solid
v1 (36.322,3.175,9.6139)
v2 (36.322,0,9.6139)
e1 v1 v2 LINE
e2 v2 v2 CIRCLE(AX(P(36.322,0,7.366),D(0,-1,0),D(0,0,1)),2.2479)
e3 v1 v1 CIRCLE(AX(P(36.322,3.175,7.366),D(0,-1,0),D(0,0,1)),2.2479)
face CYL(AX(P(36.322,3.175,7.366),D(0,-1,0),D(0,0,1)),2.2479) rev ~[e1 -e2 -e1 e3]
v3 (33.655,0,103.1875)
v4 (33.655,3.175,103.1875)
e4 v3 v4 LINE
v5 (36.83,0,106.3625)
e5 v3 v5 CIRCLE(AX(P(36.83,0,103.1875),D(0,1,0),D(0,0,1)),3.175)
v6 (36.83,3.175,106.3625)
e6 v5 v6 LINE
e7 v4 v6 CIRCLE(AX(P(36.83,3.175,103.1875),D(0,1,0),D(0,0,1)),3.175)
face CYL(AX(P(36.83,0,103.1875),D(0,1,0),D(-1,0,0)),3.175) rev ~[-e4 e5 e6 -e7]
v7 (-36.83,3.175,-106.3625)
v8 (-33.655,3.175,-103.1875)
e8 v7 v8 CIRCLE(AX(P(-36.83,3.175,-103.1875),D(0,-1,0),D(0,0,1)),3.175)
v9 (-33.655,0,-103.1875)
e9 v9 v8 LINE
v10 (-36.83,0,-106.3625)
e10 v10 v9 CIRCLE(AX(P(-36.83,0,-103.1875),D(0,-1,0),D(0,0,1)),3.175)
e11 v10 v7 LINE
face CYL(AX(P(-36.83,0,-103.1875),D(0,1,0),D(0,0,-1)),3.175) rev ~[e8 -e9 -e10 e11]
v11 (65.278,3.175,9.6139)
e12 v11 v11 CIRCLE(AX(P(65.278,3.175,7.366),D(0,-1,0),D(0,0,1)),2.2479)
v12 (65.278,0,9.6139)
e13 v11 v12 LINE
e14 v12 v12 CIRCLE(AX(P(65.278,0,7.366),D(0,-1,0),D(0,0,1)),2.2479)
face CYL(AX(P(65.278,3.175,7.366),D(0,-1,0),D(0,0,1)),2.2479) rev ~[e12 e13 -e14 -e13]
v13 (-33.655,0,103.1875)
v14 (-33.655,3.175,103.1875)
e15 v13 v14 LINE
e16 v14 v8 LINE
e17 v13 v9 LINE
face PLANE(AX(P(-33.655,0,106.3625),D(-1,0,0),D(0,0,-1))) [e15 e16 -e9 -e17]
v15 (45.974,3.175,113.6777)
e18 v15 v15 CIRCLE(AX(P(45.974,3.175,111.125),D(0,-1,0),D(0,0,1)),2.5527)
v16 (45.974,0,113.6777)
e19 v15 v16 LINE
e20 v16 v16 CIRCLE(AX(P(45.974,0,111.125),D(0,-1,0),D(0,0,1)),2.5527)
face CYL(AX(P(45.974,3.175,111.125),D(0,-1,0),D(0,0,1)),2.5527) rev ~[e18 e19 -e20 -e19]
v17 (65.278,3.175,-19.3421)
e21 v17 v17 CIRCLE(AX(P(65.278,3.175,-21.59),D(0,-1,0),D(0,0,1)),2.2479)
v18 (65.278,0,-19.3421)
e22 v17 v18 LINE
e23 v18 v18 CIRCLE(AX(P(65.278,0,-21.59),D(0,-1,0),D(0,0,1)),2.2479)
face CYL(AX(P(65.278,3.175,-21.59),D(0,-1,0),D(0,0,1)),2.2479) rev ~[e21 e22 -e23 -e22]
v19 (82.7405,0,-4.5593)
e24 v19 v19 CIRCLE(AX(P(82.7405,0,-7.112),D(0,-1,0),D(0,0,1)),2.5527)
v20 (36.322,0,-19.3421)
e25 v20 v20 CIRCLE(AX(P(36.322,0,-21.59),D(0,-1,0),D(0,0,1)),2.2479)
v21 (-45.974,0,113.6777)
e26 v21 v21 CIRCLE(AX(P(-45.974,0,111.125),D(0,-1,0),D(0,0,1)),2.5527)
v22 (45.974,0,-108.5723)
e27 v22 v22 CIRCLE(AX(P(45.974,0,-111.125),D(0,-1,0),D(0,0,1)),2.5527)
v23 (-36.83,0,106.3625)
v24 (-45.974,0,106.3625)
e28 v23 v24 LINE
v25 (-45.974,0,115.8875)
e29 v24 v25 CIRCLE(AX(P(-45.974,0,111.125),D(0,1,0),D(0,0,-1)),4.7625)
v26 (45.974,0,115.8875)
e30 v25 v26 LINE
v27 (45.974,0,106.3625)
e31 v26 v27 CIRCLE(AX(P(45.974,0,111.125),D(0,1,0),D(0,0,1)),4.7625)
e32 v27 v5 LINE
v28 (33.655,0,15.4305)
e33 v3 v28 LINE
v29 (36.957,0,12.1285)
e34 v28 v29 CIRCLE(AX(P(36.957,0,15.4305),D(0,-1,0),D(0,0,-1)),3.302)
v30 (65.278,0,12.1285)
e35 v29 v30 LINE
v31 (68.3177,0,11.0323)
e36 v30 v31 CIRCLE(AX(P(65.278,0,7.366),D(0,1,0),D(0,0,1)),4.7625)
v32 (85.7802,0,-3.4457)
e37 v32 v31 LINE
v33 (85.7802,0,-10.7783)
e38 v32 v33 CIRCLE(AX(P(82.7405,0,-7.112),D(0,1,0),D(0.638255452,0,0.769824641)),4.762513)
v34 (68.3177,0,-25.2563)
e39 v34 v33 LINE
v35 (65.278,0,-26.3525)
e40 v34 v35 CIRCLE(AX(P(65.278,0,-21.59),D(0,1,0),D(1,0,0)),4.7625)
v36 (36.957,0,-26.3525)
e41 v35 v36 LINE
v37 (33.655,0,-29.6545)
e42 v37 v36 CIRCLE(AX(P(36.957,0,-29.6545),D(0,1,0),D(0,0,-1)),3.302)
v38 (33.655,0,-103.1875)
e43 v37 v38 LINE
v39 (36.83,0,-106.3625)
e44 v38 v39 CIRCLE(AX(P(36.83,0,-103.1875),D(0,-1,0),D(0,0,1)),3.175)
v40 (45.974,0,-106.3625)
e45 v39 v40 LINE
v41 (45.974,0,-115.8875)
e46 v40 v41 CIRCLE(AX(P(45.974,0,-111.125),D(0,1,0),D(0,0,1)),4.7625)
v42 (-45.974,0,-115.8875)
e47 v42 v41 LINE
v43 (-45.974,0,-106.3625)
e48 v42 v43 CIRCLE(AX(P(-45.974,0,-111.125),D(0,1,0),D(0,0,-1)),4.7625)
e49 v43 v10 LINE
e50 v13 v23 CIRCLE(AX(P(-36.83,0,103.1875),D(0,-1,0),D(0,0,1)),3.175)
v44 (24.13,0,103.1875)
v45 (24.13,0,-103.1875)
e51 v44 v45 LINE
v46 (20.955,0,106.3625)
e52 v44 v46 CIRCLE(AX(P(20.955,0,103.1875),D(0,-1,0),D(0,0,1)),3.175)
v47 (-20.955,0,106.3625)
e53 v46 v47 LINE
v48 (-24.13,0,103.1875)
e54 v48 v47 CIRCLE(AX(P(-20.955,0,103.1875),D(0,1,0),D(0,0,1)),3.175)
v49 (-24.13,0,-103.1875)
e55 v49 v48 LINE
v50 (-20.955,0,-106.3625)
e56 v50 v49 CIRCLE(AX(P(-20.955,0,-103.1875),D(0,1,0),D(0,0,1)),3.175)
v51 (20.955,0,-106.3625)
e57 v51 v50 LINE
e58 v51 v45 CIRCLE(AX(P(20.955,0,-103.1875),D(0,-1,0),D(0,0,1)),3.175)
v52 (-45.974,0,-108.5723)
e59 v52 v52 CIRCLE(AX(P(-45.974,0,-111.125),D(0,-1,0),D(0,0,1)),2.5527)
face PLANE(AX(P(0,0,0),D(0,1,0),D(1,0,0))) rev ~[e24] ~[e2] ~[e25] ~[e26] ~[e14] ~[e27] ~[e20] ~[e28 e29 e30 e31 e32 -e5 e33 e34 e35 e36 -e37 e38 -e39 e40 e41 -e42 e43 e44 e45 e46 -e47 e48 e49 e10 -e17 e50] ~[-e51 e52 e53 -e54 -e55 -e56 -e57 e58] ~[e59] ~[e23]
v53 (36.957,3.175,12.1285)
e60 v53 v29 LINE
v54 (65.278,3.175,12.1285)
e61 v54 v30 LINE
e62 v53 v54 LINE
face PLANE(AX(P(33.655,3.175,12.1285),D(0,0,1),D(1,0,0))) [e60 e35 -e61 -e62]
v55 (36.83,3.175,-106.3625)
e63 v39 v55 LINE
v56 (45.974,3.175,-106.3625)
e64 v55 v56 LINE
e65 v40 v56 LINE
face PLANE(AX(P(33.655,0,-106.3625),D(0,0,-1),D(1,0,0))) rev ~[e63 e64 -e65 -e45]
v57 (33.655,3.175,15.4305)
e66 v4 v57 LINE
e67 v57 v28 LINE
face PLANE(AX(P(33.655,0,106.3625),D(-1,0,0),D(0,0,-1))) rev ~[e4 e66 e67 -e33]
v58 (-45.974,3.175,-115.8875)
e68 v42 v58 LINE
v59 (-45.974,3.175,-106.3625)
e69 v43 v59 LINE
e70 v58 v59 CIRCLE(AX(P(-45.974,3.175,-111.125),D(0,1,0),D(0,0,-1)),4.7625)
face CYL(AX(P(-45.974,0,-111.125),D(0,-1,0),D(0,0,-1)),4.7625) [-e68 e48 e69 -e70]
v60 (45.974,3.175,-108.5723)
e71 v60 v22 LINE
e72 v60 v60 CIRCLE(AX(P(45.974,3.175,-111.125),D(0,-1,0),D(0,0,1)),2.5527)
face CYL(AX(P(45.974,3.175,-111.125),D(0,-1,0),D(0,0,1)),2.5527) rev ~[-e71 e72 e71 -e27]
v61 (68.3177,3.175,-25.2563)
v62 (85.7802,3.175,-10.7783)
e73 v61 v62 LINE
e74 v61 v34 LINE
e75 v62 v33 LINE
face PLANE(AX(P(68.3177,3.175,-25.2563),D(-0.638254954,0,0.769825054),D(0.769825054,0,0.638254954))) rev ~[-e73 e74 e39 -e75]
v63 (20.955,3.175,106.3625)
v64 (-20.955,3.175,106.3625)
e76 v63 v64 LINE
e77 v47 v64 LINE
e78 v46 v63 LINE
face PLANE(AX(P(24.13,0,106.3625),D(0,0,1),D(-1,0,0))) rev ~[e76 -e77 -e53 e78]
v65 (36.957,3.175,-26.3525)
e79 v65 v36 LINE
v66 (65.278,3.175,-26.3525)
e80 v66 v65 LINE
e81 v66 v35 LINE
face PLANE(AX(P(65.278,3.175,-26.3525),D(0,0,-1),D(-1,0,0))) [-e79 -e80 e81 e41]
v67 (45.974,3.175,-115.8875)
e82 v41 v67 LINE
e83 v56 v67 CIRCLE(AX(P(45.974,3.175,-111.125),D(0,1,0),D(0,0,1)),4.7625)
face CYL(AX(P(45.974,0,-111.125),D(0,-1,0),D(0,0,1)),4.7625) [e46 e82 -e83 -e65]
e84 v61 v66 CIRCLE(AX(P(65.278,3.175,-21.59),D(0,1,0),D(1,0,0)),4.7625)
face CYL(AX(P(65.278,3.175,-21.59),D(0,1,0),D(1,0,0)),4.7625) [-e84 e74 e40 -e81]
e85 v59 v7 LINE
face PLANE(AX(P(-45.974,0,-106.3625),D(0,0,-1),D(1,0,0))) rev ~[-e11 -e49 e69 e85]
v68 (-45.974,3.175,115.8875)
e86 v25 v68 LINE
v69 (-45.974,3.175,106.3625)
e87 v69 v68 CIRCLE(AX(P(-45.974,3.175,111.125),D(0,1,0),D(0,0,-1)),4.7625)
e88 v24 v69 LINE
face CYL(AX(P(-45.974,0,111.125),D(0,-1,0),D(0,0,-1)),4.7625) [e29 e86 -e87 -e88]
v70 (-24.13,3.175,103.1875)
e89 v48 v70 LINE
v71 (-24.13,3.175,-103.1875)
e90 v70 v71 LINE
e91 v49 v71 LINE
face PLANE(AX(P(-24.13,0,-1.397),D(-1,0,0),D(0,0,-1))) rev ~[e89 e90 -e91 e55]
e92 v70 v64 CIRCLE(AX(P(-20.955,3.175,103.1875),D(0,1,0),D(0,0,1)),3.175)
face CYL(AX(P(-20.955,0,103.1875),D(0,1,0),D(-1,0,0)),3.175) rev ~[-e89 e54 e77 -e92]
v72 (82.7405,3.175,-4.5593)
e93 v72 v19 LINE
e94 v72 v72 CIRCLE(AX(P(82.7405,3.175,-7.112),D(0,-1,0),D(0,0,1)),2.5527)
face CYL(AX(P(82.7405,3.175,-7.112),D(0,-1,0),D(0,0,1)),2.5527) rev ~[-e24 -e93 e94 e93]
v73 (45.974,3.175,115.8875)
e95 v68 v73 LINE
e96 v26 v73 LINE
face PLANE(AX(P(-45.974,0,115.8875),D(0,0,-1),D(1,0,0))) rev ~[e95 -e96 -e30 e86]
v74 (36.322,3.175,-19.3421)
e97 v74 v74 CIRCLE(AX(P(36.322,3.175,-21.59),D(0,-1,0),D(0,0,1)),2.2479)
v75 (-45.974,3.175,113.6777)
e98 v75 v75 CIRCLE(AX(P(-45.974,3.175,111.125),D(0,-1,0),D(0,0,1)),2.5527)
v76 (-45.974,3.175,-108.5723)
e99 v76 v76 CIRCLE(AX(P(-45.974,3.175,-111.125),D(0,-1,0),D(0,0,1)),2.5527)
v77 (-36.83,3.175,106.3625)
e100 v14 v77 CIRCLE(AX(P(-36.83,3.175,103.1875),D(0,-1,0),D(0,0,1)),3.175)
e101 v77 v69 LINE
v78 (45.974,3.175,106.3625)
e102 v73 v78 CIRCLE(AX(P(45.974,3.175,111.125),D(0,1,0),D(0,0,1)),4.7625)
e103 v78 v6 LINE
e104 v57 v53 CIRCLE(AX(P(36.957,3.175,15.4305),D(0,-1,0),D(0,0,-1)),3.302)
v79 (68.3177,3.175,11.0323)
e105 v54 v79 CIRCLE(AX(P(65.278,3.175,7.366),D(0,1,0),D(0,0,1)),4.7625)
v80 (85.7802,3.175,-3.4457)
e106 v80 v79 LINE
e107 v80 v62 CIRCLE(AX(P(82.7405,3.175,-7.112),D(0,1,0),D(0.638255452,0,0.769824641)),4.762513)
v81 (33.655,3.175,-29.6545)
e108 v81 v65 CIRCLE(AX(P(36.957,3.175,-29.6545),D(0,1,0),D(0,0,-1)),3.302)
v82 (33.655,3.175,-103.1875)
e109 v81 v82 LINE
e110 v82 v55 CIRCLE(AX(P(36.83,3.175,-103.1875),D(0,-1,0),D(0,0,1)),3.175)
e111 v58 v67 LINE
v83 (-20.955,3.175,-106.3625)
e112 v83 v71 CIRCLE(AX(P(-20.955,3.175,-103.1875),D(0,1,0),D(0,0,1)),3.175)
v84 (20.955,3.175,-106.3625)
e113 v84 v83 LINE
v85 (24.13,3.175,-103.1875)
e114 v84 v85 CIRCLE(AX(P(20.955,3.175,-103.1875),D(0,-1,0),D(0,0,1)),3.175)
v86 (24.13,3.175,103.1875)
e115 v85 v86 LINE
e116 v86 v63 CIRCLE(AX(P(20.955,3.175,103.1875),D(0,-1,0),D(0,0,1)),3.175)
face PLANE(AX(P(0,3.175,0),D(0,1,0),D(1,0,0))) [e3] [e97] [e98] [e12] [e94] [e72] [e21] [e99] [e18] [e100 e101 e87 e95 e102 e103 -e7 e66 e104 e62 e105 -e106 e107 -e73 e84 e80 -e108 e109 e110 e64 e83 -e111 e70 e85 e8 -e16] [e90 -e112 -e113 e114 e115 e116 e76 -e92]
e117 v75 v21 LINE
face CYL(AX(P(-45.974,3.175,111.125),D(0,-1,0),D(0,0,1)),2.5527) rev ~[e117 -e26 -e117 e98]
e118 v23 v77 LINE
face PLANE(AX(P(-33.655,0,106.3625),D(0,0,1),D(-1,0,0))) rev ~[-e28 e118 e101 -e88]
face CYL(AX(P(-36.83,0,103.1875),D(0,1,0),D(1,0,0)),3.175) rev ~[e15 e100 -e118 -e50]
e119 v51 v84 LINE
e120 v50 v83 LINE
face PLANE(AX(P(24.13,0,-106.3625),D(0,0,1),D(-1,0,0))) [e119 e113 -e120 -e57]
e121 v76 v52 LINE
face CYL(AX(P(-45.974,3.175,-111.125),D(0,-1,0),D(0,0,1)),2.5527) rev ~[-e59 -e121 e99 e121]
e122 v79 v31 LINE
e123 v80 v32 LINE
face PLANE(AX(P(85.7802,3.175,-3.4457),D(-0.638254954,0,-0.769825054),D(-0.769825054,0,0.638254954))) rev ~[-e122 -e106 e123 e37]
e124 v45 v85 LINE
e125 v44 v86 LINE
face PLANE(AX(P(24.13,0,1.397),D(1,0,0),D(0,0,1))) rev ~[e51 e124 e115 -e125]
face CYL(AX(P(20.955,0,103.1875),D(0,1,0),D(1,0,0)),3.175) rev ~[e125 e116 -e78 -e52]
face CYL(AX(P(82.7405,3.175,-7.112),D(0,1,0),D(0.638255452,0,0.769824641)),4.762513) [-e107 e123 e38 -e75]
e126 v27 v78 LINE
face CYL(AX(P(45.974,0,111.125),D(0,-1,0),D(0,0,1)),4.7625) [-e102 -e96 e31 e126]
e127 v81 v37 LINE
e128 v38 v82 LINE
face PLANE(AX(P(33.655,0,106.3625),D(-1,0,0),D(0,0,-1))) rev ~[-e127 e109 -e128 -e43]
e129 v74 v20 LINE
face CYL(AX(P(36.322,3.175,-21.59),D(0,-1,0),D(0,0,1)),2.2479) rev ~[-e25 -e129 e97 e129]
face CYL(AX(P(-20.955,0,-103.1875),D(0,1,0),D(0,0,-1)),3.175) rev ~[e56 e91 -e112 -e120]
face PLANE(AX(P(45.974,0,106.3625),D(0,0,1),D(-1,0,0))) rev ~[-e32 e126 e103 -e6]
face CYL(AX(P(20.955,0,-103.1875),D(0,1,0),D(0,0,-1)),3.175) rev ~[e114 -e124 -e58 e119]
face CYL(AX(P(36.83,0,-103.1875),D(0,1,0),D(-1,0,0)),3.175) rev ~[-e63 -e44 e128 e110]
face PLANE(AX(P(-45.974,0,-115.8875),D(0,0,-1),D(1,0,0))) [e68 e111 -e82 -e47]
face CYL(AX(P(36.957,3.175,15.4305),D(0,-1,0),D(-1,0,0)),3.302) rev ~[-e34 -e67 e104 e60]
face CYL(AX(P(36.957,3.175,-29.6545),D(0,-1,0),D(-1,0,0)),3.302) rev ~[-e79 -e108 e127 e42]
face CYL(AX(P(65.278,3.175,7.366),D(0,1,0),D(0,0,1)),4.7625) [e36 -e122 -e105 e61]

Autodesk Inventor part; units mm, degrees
ref_plane "YZ Plane" through (0, 0, 0) normal (1, 0, 0) x (0, 1, 0)
ref_plane "XZ Plane" through (0, 0, 0) normal (0, 1, 0) x (-1, 0, 0)
ref_plane "XY Plane" through (0, 0, 0) normal (0, 0, 1) x (1, 0, 0)
sketch "Sketch1" plane through (0, 0, 0) normal (0, 1, 0) x (-1, 0, 0)
  line L0 (45.974, 111.125) -> (-45.974, 111.125) construction
  line L1 (45.974, 115.8875) -> (-45.974, 115.8875)
  line L2 (-45.974, 106.3625) -> (45.974, 106.3625)
  arc A0 (45.974, 106.3625) -> (45.974, 115.8875) centre (45.974, 111.125) ccw
  arc A1 (-45.974, 115.8875) -> (-45.974, 106.3625) centre (-45.974, 111.125) ccw
  line L3 (0, 111.125) -> (0, -111.125) construction
  line L4 (45.974, -111.125) -> (-45.974, -111.125) construction
  line L5 (45.974, -115.8875) -> (-45.974, -115.8875)
  line L6 (-45.974, -106.3625) -> (45.974, -106.3625) construction
  arc A2 (45.974, -115.8875) -> (45.974, -106.3625) centre (45.974, -111.125) ccw
  arc A3 (-45.974, -106.3625) -> (-45.974, -115.8875) centre (-45.974, -111.125) ccw
  line L7 (24.13, 106.3625) -> (24.13, -106.3625)
  line L8 (-24.13, 106.3625) -> (-24.13, -106.3625) construction
  line L9 (24.13, 0) -> (-24.13, 0) construction
  line L10 (33.655, 106.3625) -> (33.655, -106.3625)
  line L11 (-33.655, 106.3625) -> (-33.655, -106.3625)
  line L12 (45.974, -106.3625) -> (33.655, -106.3625)
  line L13 (-24.13, -106.3625) -> (24.13, -106.3625)
  line L14 (-24.13, -106.3625) -> (-24.13, 106.3625)
  line L15 (-33.655, -106.3625) -> (-45.974, -106.3625)
  line L16 (14.478, 14.478) -> (-14.478, -14.478) construction
  circle A4 centre (14.478, 14.478) radius 4.7625 construction
  circle A5 centre (-14.478, -14.478) radius 4.7625 construction
  line L17 (11.1788, 17.9127) -> (24.13, 30.353)
  line L18 (11.1788, 11.0433) -> (24.13, -1.397)
  line L19 (-11.1788, -17.9127) -> (-24.13, -30.353)
  line L20 (-11.1788, -11.0433) -> (-24.13, 1.397)
  arc A6 (11.1788, 17.9127) -> (11.1788, 11.0433) centre (14.478, 14.478) ccw
  arc A7 (-11.1788, -17.9127) -> (-11.1788, -11.0433) centre (-14.478, -14.478) ccw
  point P0 (0, 0)
  point P1 (0, 0)
  point P2 (0, 0)
  point P3 (-33.655, 106.3625)
  point P4 (33.655, 106.3625)
  point P5 (0, 0)
  dimension "d0" = 9.525
  dimension "d1" = 91.948
  dimension "d2" = 222.25
  dimension "d4" = 9.525
  dimension "d5" = 48.26
  dimension "d6" = 9.525
  dimension "d7" = 9.525
  dimension "d33" = 28.956
  dimension "d34" = 28.956
  dimension "d35" = 9.525
  dimension "d36" = 9.525
  dimension "d37" = 15.875
  dimension "d38" = 15.875
  dimension "d39" = 15.875
  dimension "d40" = 15.875
extrude "Extrusion1" add sketch "Sketch1" along normal blind 3.175 contours A0 L2 A1 L1 | L10 L12 A2 L5 A3 L15 L11 L2 L14 L13 L7
sketch "Sketch2" plane through (0, 3.175, 0) normal (0, 1, 0) x (1, 0, 0)
  line L0 (-33.655, -106.3625) -> (-45.974, -106.3625) construction
  arc A0 (-45.974, -106.3625) -> (-45.974, -115.8875) centre (-45.974, -111.125) ccw construction
  line L1 (-45.974, -115.8875) -> (45.974, -115.8875) construction
  arc A1 (45.974, -115.8875) -> (45.974, -106.3625) centre (45.974, -111.125) ccw construction
  line L2 (-24.13, -106.3625) -> (-24.13, 106.3625) projected
  line L3 (-24.13, 106.3625) -> (24.13, 106.3625) projected
  line L4 (24.13, 106.3625) -> (24.13, -106.3625) projected
  line L5 (24.13, -106.3625) -> (-24.13, -106.3625) projected
  line L6 (45.974, -106.3625) -> (33.655, -106.3625) projected
  line L7 (33.655, -106.3625) -> (33.655, 106.3625) projected
  line L8 (33.655, 106.3625) -> (45.974, 106.3625) projected
  arc A2 (45.974, 106.3625) -> (45.974, 115.8875) centre (45.974, 111.125) ccw projected
  line L9 (45.974, 115.8875) -> (-45.974, 115.8875) projected
  arc A3 (-45.974, 115.8875) -> (-45.974, 106.3625) centre (-45.974, 111.125) ccw projected
  line L10 (-45.974, 106.3625) -> (-33.655, 106.3625) projected
  line L11 (-33.655, 106.3625) -> (-33.655, -106.3625) projected
  point P0 (0, 0)
  point P1 (45.974, 111.125)
  point P2 (-45.974, 111.125)
  point P3 (-14.478, 71.0565)
  point P4 (14.478, 100.0125)
hole "Hole1" at (-45.974, 3.175, 111.125) at (45.974, 3.175, 111.125) at (45.974, 3.175, -111.125) at (-45.974, 3.175, -111.125) direction (0, -1, 0) diameter 5.1054 end through all clearance for "Flat Head Machine Screw (82)" size "#10" standard "Ansi Unified Screw Threads"
sketch "Sketch3" plane through (0, 3.175, 0) normal (0, 1, 0) x (1, 0, 0)
  circle A0 centre (45.974, 111.125) radius 2.5527 construction
  circle A1 centre (-45.974, -111.125) radius 2.5527 construction
  circle A2 centre (45.974, -111.125) radius 2.5527 construction
  circle A3 centre (-45.974, 111.125) radius 2.5527 construction
  line L0 (-24.13, -106.3625) -> (24.13, -106.3625) construction
  line L1 (24.13, -106.3625) -> (24.13, 106.3625) construction
  line L2 (24.13, 106.3625) -> (-24.13, 106.3625) construction
  line L3 (-24.13, 106.3625) -> (-24.13, -106.3625) construction
  line L4 (-33.655, -106.3625) -> (-33.655, 106.3625) construction
  line L5 (-33.655, 106.3625) -> (-45.974, 106.3625) construction
  arc A4 (-45.974, 115.8875) -> (-45.974, 106.3625) centre (-45.974, 111.125) ccw construction
  line L6 (-45.974, 115.8875) -> (45.974, 115.8875) construction
  arc A5 (45.974, 106.3625) -> (45.974, 115.8875) centre (45.974, 111.125) ccw construction
  line L7 (45.974, 106.3625) -> (33.655, 106.3625) construction
  line L8 (33.655, 106.3625) -> (33.655, -106.3625) construction
  line L9 (33.655, -106.3625) -> (45.974, -106.3625) construction
  arc A6 (45.974, -115.8875) -> (45.974, -106.3625) centre (45.974, -111.125) ccw construction
  line L10 (45.974, -115.8875) -> (-45.974, -115.8875) construction
  arc A7 (-45.974, -106.3625) -> (-45.974, -115.8875) centre (-45.974, -111.125) ccw construction
  line L11 (-45.974, -106.3625) -> (-33.655, -106.3625) construction
  line L12 (65.278, -7.366) -> (36.322, 21.59) construction
  circle A8 centre (65.278, -7.366) radius 4.7625 construction
  circle A9 centre (36.322, 21.59) radius 4.7625 construction
  line L13 (33.655, -106.3625) -> (33.655, 106.3625) construction
  circle A10 centre (36.322, -7.366) radius 4.7625 construction
  circle A11 centre (65.278, 21.59) radius 4.7625 construction
  line L14 (33.655, -12.1285) -> (65.278, -12.1285)
  line L15 (70.0405, -7.366) -> (70.0405, 21.59)
  line L16 (65.278, 26.3525) -> (33.655, 26.3525)
  arc A12 (65.278, -12.1285) -> (70.0405, -7.366) centre (65.278, -7.366) ccw
  arc A13 (70.0405, 21.59) -> (65.278, 26.3525) centre (65.278, 21.59) ccw
  line L17 (33.655, -12.1285) -> (33.655, 26.3525)
  point P0 (0, 0)
  point P1 (50.8, 7.112)
  dimension "d48" = 31.623
  dimension "d50" = 28.956
  dimension "d51" = 9.525
  dimension "d66" = 7.112
  dimension "d67" = 28.956
extrude "Extrusion2" add sketch "Sketch3" against normal blind 3.175
fillet "Fillet2" radius 3.302 2 edges at (33.655, 1.5875, 12.1285) (33.655, 1.5875, -26.3525)
hole "Hole4" at (65.278, 3.175, 7.366) at (36.322, 3.175, -21.59) at (36.322, 3.175, 7.366) at (65.278, 3.175, -21.59) direction (0, -1, 0) diameter 4.4958 end through all clearance for "Flat Head Machine Screw (82)" size "#8" standard "Ansi Unified Screw Threads"
sketch "Sketch5" plane through (0, 3.175, 0) normal (0, 1, 0) x (1, 0, 0)
  circle A0 centre (82.7405, 7.112) radius 4.7625 construction
  circle A1 centre (36.322, -7.366) radius 2.2479 construction
  circle A2 centre (65.278, -7.366) radius 2.2479 construction
  circle A3 centre (36.322, 21.59) radius 2.2479 construction
  circle A4 centre (65.278, 21.59) radius 2.2479 construction
  circle A5 centre (45.974, 111.125) radius 2.5527 construction
  circle A6 centre (-45.974, -111.125) radius 2.5527 construction
  circle A7 centre (45.974, -111.125) radius 2.5527 construction
  circle A8 centre (-45.974, 111.125) radius 2.5527 construction
  line L0 (-24.13, -106.3625) -> (24.13, -106.3625) construction
  line L1 (24.13, -106.3625) -> (24.13, 106.3625) construction
  line L2 (24.13, 106.3625) -> (-24.13, 106.3625) construction
  line L3 (-24.13, 106.3625) -> (-24.13, -106.3625) construction
  line L4 (-33.655, -106.3625) -> (-33.655, 106.3625) construction
  line L5 (-33.655, 106.3625) -> (-45.974, 106.3625) construction
  arc A9 (-45.974, 115.8875) -> (-45.974, 106.3625) centre (-45.974, 111.125) ccw construction
  line L6 (-45.974, 115.8875) -> (45.974, 115.8875) construction
  arc A10 (45.974, 106.3625) -> (45.974, 115.8875) centre (45.974, 111.125) ccw construction
  line L7 (45.974, 106.3625) -> (33.655, 106.3625) construction
  line L8 (33.655, 106.3625) -> (33.655, 29.6545) construction
  arc A11 (33.655, 29.6545) -> (36.957, 26.3525) centre (36.957, 29.6545) ccw construction
  line L9 (36.957, 26.3525) -> (65.278, 26.3525) construction
  arc A12 (70.0405, 21.59) -> (65.278, 26.3525) centre (65.278, 21.59) ccw construction
  line L10 (70.0405, 21.59) -> (70.0405, -7.366) construction
  arc A13 (65.278, -12.1285) -> (70.0405, -7.366) centre (65.278, -7.366) ccw construction
  line L11 (65.278, -12.1285) -> (36.957, -12.1285) construction
  arc A14 (36.957, -12.1285) -> (33.655, -15.4305) centre (36.957, -15.4305) ccw construction
  line L12 (33.655, -15.4305) -> (33.655, -106.3625) construction
  line L13 (33.655, -106.3625) -> (45.974, -106.3625) construction
  arc A15 (45.974, -115.8875) -> (45.974, -106.3625) centre (45.974, -111.125) ccw construction
  line L14 (45.974, -115.8875) -> (-45.974, -115.8875) construction
  arc A16 (-45.974, -106.3625) -> (-45.974, -115.8875) centre (-45.974, -111.125) ccw construction
  line L15 (-45.974, -106.3625) -> (-33.655, -106.3625) construction
  arc A17 (70.0405, 21.59) -> (65.278, 26.3525) centre (65.278, 21.59) ccw construction
  line L16 (68.3177, 25.2563) -> (85.7802, 10.7783)
  line L17 (85.7802, 3.4457) -> (68.3177, -11.0323)
  arc A18 (85.7802, 3.4457) -> (85.7802, 10.7783) centre (82.7405, 7.112) ccw
  line L18 (70.0405, 21.59) -> (70.0405, -7.366)
  arc A19 (70.0405, 21.59) -> (68.3177, 25.2563) centre (65.278, 21.59) ccw
  arc A20 (65.278, -12.1285) -> (70.0405, -7.366) centre (65.278, -7.366) ccw construction
  arc A21 (68.3177, -11.0323) -> (70.0405, -7.366) centre (65.278, -7.366) ccw
  point P0 (0, 0)
  point P1 (70.0405, 7.112)
  point P2 (70.0405, -7.366)
  dimension "d76" = 9.525
  dimension "d77" = 12.7
extrude "Extrusion3" add sketch "Sketch5" against normal up to surface (3.175 mm away)
hole "Hole6" at (82.7405, 3.175, -7.112) direction (0, -1, 0) diameter 5.1054 end through all clearance for "Flat Head Machine Screw (82)" size "#10" standard "Ansi Unified Screw Threads"
fillet "Fillet3" radius 3.175 8 edges at (-24.13, 1.5875, -106.3625) (24.13, 1.5875, -106.3625) (-33.655, 1.5875, -106.3625) (33.655, 1.5875, -106.3625) (-33.655, 1.5875, 106.3625) (-24.13, 1.5875, 106.3625) (24.13, 1.5875, 106.3625) (33.655, 1.5875, 106.3625)
equation "\"d4\" = d0"
equation "\"d6\" = d7"
equation "\"d38\" = d37"
equation "\"d39\" = d37"
equation "\"d40\" = d39"
properties part number "DB1-007" material "Aluminum 6061"
